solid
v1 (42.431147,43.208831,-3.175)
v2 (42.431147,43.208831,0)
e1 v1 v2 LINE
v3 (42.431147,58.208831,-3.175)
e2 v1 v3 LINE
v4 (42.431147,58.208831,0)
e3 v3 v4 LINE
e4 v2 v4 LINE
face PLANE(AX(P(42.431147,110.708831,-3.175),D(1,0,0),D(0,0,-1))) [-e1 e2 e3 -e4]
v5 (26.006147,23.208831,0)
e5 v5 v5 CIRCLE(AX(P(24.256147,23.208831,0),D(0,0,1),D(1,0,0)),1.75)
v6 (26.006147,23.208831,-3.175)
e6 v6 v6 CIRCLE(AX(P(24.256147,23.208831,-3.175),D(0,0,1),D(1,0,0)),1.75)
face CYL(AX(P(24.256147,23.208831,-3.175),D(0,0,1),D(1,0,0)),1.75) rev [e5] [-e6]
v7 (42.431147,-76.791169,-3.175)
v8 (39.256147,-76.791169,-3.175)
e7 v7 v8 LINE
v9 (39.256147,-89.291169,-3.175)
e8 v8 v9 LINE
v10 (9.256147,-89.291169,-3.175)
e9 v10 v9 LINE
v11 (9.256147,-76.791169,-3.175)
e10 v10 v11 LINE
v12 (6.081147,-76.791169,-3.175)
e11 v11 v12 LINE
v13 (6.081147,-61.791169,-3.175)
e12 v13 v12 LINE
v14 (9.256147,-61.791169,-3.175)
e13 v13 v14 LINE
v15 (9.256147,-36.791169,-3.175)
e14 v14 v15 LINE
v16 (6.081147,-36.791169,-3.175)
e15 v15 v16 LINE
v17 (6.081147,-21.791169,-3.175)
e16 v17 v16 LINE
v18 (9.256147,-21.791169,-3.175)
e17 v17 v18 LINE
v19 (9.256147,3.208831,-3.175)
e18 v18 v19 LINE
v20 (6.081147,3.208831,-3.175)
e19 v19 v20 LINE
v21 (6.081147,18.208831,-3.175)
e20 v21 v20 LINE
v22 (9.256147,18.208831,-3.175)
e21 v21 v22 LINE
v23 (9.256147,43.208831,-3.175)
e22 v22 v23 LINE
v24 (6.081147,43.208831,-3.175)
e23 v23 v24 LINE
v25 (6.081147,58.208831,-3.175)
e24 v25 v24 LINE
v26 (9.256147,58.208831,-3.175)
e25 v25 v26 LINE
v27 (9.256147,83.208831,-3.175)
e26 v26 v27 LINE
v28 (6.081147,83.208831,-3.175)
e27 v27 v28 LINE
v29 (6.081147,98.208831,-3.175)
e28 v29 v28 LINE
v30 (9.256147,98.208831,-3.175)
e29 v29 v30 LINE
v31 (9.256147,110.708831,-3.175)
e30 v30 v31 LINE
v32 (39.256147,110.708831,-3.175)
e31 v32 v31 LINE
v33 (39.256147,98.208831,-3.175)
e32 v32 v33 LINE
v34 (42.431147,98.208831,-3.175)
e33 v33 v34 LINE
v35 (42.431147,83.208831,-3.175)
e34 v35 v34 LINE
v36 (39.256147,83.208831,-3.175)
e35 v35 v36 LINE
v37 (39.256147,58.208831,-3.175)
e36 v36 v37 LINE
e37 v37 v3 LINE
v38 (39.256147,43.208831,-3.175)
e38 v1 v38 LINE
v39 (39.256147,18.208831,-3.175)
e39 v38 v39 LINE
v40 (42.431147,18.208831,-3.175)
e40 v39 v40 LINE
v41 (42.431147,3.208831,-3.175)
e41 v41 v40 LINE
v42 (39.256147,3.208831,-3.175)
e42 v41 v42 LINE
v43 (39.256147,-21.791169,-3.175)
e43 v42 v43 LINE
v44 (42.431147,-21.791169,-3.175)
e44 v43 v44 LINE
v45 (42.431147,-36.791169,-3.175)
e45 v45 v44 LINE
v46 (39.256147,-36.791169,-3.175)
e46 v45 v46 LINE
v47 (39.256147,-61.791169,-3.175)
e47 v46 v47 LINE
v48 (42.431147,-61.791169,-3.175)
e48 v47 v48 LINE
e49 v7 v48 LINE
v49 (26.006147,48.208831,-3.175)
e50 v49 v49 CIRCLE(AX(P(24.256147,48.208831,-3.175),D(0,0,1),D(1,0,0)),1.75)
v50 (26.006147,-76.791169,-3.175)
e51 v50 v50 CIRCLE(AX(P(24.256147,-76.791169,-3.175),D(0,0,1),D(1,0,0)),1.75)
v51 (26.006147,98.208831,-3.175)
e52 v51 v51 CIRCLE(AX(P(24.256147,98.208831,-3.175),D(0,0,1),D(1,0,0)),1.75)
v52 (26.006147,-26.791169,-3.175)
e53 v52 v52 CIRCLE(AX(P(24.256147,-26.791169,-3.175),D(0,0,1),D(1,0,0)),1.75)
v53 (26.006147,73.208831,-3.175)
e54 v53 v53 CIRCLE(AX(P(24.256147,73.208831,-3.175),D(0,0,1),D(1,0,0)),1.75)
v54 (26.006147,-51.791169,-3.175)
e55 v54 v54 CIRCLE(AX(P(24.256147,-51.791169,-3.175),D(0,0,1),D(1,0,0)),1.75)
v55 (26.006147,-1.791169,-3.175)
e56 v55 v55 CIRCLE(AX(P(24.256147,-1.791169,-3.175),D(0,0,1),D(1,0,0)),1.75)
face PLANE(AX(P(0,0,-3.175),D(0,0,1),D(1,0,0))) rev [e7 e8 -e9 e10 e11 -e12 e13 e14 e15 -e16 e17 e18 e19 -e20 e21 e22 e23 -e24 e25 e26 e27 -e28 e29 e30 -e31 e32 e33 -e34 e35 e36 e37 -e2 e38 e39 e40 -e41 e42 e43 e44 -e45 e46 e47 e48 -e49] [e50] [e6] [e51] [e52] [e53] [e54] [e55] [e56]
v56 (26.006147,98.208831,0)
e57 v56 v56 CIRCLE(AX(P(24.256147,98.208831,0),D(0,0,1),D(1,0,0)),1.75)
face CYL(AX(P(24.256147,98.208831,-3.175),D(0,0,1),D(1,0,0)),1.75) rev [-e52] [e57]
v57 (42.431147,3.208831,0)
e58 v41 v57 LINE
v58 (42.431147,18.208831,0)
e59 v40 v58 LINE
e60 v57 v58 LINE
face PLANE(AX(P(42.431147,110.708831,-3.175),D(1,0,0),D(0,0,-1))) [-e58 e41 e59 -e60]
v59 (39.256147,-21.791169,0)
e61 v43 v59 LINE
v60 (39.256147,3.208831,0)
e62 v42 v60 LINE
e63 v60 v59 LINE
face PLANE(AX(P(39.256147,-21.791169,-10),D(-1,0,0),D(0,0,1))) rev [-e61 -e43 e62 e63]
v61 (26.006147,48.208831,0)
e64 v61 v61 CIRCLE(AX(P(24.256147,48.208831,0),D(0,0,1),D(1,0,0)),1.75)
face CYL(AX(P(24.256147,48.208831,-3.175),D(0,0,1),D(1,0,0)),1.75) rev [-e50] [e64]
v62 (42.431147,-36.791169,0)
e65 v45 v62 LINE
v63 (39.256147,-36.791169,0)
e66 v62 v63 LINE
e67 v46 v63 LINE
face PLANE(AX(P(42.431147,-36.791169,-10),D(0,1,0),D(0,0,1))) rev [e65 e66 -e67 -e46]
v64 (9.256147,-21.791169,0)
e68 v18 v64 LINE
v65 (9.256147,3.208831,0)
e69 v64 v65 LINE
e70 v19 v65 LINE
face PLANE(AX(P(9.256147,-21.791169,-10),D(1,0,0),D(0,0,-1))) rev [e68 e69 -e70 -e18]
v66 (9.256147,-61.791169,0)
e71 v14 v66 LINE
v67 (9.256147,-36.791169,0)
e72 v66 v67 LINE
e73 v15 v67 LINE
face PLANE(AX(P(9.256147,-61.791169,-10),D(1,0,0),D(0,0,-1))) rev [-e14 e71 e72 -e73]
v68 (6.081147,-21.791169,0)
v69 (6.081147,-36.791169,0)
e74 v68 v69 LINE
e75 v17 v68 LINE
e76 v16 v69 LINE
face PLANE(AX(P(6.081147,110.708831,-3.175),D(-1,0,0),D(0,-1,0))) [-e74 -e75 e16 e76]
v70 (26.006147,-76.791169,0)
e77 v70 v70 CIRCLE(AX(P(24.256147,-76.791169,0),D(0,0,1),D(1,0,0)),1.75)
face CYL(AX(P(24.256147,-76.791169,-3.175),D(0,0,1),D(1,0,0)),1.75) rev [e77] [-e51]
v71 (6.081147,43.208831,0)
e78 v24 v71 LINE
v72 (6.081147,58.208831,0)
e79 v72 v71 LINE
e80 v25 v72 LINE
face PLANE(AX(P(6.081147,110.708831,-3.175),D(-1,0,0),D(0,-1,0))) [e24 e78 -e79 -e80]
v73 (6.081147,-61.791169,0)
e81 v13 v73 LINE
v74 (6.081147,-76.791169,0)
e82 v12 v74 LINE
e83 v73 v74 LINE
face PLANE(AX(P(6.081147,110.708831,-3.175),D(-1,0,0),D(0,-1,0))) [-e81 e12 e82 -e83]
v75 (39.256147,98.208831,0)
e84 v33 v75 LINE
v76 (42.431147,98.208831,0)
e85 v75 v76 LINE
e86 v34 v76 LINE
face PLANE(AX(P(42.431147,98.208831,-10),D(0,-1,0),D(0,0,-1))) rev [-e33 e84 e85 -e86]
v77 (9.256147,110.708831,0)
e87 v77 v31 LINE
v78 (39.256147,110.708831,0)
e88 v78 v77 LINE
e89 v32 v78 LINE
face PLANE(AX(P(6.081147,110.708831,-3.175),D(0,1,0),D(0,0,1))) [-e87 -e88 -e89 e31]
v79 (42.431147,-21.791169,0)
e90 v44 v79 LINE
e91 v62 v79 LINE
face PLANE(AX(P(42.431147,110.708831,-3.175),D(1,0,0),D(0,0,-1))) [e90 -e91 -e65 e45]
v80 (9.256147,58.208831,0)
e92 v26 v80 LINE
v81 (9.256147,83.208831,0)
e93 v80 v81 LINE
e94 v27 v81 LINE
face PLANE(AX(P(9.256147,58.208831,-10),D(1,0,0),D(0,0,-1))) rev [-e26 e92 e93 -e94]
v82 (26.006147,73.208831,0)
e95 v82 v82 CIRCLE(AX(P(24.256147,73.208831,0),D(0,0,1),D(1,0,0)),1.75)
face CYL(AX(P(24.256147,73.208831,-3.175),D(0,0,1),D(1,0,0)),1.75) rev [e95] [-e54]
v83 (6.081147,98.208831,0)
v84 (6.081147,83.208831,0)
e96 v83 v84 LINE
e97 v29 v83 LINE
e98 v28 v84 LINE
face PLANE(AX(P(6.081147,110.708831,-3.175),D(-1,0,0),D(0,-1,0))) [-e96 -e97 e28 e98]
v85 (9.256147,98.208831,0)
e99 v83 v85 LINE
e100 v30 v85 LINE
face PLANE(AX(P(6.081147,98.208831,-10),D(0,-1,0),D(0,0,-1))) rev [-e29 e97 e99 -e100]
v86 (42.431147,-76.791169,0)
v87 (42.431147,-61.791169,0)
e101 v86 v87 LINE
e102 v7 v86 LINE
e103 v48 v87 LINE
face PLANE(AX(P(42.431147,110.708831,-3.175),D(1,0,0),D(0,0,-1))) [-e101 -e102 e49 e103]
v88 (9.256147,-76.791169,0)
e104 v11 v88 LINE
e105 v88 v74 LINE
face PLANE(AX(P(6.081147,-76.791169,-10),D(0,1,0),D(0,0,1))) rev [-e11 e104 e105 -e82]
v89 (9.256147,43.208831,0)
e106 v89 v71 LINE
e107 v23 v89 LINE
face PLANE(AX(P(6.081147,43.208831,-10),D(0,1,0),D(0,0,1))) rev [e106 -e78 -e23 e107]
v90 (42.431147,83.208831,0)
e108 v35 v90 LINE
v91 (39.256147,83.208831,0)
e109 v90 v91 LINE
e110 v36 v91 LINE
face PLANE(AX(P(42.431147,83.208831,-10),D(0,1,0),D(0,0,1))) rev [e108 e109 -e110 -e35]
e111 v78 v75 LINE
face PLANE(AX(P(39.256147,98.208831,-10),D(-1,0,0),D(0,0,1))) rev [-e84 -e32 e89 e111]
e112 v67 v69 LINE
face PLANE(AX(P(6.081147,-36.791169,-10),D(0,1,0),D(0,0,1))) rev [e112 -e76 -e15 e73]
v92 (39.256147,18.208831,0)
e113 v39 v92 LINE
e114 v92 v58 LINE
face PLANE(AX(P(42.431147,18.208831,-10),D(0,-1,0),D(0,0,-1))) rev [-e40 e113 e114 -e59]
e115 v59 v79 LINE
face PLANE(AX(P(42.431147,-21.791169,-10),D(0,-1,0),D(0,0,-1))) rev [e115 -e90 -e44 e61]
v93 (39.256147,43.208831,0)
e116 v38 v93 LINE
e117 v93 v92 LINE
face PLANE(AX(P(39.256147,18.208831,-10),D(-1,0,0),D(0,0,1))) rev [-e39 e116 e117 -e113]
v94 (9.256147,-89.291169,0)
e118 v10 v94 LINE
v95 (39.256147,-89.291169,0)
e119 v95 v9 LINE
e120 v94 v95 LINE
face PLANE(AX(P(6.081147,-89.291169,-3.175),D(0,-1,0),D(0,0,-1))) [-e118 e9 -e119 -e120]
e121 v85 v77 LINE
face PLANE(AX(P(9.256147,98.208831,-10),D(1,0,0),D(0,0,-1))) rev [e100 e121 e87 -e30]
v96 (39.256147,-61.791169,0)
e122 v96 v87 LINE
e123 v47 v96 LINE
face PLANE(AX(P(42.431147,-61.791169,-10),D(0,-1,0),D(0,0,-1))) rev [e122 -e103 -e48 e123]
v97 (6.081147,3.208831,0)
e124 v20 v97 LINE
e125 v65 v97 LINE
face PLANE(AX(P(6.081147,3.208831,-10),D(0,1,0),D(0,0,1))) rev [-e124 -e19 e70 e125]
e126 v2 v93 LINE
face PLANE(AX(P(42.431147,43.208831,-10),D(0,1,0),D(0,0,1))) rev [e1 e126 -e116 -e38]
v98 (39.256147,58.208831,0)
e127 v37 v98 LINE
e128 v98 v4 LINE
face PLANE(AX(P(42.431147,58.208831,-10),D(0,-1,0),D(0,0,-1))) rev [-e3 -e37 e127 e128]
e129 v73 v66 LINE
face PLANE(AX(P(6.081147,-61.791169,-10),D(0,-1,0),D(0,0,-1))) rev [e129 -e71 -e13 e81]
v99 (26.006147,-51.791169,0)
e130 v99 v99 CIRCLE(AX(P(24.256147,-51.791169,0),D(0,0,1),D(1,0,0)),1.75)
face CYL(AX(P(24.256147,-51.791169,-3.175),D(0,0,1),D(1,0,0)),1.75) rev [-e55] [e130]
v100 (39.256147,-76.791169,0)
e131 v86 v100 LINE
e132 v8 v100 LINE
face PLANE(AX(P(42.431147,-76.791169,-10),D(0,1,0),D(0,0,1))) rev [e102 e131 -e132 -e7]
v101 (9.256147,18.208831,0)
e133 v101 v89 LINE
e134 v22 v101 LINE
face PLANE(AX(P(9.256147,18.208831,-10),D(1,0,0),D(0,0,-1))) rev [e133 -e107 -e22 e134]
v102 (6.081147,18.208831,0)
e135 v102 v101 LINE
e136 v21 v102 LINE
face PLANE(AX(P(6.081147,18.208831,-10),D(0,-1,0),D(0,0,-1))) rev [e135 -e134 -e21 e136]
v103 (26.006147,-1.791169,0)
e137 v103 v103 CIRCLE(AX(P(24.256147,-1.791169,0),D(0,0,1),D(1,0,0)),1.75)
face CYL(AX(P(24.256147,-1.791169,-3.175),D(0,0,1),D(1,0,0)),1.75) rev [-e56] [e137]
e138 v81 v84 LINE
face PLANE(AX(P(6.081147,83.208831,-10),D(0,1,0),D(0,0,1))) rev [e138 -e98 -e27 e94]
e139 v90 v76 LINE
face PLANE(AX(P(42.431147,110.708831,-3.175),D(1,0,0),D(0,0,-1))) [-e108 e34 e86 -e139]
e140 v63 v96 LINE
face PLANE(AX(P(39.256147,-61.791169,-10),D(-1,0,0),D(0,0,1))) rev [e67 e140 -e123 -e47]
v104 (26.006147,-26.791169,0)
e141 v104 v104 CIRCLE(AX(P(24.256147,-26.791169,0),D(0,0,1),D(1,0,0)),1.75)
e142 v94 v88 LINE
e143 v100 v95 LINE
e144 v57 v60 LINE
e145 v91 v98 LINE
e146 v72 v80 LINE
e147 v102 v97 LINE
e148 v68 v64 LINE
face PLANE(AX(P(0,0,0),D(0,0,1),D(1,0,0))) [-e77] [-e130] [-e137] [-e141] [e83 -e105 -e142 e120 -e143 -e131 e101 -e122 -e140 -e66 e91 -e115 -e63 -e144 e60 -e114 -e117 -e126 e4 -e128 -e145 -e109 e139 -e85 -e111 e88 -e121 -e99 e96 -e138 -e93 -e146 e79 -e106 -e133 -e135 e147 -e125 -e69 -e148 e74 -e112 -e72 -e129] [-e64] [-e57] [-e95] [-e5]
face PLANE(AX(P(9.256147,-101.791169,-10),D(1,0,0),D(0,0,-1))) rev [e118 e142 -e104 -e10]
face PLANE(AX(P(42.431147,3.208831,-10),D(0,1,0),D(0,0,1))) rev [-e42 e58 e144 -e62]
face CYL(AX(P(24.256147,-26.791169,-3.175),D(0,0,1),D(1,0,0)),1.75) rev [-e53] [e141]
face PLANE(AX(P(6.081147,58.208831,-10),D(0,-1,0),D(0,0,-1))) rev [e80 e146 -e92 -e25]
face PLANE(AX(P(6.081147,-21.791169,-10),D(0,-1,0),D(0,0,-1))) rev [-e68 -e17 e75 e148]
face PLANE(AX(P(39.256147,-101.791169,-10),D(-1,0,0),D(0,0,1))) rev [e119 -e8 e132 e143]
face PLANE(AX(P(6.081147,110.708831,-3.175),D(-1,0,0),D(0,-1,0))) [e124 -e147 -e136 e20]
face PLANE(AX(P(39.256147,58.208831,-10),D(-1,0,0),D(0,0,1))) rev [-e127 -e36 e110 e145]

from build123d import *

# Parameters (mm, degrees)
SKETCH1_W          = 36.35
SKETCH1_H          = 200
SKETCH1_R          = 1.75
BASE_FLANGE1_DEPTH = 3.175
SKETCH2_W          = 3.175
SKETCH2_H          = 25
CUT_EXTRUDE1_DEPTH = 10
LPATTERN1_COUNT    = 6
LPATTERN1_PITCH    = 40


# Sheet-metal steps are written as plain solids
with BuildPart() as part:
    # Sketch1 → Base-Flange1 (new body)
    with BuildSketch(Plane.XY):
        with Locations((24.256146731, 10.708830738)):
            Rectangle(SKETCH1_W, SKETCH1_H)
        with Locations((24.256146731, 98.208830738)):
            Circle(SKETCH1_R, mode=Mode.SUBTRACT)
        with Locations((24.256146731, 73.208830738)):
            Circle(SKETCH1_R, mode=Mode.SUBTRACT)
        with Locations((24.256146731, 48.208830738)):
            Circle(SKETCH1_R, mode=Mode.SUBTRACT)
        with Locations((24.256146731, 23.208830738)):
            Circle(SKETCH1_R, mode=Mode.SUBTRACT)
        with Locations((24.256146731, -1.791169262)):
            Circle(SKETCH1_R, mode=Mode.SUBTRACT)
        with Locations((24.256146731, -26.791169262)):
            Circle(SKETCH1_R, mode=Mode.SUBTRACT)
        with Locations((24.256146731, -51.791169262)):
            Circle(SKETCH1_R, mode=Mode.SUBTRACT)
        with Locations((24.256146731, -76.791169262)):
            Circle(SKETCH1_R, mode=Mode.SUBTRACT)
    extrude(amount=-BASE_FLANGE1_DEPTH)

    # Sketch2 → Cut-Extrude1 (cut)
    with BuildSketch(Plane.XY):
        with Locations((7.668646731, -89.291169262)):
            Rectangle(SKETCH2_W, SKETCH2_H)
        with Locations((40.843646731, -89.291169262)):
            Rectangle(SKETCH2_W, SKETCH2_H)
    cut_extrude1 = extrude(amount=-CUT_EXTRUDE1_DEPTH, mode=Mode.SUBTRACT)

    # LPattern1: Cut-Extrude1 ×6
    with Locations(*[(0, i * LPATTERN1_PITCH, 0) for i in range(1, LPATTERN1_COUNT)]):
        add(cut_extrude1, mode=Mode.SUBTRACT)


solid = part.part
